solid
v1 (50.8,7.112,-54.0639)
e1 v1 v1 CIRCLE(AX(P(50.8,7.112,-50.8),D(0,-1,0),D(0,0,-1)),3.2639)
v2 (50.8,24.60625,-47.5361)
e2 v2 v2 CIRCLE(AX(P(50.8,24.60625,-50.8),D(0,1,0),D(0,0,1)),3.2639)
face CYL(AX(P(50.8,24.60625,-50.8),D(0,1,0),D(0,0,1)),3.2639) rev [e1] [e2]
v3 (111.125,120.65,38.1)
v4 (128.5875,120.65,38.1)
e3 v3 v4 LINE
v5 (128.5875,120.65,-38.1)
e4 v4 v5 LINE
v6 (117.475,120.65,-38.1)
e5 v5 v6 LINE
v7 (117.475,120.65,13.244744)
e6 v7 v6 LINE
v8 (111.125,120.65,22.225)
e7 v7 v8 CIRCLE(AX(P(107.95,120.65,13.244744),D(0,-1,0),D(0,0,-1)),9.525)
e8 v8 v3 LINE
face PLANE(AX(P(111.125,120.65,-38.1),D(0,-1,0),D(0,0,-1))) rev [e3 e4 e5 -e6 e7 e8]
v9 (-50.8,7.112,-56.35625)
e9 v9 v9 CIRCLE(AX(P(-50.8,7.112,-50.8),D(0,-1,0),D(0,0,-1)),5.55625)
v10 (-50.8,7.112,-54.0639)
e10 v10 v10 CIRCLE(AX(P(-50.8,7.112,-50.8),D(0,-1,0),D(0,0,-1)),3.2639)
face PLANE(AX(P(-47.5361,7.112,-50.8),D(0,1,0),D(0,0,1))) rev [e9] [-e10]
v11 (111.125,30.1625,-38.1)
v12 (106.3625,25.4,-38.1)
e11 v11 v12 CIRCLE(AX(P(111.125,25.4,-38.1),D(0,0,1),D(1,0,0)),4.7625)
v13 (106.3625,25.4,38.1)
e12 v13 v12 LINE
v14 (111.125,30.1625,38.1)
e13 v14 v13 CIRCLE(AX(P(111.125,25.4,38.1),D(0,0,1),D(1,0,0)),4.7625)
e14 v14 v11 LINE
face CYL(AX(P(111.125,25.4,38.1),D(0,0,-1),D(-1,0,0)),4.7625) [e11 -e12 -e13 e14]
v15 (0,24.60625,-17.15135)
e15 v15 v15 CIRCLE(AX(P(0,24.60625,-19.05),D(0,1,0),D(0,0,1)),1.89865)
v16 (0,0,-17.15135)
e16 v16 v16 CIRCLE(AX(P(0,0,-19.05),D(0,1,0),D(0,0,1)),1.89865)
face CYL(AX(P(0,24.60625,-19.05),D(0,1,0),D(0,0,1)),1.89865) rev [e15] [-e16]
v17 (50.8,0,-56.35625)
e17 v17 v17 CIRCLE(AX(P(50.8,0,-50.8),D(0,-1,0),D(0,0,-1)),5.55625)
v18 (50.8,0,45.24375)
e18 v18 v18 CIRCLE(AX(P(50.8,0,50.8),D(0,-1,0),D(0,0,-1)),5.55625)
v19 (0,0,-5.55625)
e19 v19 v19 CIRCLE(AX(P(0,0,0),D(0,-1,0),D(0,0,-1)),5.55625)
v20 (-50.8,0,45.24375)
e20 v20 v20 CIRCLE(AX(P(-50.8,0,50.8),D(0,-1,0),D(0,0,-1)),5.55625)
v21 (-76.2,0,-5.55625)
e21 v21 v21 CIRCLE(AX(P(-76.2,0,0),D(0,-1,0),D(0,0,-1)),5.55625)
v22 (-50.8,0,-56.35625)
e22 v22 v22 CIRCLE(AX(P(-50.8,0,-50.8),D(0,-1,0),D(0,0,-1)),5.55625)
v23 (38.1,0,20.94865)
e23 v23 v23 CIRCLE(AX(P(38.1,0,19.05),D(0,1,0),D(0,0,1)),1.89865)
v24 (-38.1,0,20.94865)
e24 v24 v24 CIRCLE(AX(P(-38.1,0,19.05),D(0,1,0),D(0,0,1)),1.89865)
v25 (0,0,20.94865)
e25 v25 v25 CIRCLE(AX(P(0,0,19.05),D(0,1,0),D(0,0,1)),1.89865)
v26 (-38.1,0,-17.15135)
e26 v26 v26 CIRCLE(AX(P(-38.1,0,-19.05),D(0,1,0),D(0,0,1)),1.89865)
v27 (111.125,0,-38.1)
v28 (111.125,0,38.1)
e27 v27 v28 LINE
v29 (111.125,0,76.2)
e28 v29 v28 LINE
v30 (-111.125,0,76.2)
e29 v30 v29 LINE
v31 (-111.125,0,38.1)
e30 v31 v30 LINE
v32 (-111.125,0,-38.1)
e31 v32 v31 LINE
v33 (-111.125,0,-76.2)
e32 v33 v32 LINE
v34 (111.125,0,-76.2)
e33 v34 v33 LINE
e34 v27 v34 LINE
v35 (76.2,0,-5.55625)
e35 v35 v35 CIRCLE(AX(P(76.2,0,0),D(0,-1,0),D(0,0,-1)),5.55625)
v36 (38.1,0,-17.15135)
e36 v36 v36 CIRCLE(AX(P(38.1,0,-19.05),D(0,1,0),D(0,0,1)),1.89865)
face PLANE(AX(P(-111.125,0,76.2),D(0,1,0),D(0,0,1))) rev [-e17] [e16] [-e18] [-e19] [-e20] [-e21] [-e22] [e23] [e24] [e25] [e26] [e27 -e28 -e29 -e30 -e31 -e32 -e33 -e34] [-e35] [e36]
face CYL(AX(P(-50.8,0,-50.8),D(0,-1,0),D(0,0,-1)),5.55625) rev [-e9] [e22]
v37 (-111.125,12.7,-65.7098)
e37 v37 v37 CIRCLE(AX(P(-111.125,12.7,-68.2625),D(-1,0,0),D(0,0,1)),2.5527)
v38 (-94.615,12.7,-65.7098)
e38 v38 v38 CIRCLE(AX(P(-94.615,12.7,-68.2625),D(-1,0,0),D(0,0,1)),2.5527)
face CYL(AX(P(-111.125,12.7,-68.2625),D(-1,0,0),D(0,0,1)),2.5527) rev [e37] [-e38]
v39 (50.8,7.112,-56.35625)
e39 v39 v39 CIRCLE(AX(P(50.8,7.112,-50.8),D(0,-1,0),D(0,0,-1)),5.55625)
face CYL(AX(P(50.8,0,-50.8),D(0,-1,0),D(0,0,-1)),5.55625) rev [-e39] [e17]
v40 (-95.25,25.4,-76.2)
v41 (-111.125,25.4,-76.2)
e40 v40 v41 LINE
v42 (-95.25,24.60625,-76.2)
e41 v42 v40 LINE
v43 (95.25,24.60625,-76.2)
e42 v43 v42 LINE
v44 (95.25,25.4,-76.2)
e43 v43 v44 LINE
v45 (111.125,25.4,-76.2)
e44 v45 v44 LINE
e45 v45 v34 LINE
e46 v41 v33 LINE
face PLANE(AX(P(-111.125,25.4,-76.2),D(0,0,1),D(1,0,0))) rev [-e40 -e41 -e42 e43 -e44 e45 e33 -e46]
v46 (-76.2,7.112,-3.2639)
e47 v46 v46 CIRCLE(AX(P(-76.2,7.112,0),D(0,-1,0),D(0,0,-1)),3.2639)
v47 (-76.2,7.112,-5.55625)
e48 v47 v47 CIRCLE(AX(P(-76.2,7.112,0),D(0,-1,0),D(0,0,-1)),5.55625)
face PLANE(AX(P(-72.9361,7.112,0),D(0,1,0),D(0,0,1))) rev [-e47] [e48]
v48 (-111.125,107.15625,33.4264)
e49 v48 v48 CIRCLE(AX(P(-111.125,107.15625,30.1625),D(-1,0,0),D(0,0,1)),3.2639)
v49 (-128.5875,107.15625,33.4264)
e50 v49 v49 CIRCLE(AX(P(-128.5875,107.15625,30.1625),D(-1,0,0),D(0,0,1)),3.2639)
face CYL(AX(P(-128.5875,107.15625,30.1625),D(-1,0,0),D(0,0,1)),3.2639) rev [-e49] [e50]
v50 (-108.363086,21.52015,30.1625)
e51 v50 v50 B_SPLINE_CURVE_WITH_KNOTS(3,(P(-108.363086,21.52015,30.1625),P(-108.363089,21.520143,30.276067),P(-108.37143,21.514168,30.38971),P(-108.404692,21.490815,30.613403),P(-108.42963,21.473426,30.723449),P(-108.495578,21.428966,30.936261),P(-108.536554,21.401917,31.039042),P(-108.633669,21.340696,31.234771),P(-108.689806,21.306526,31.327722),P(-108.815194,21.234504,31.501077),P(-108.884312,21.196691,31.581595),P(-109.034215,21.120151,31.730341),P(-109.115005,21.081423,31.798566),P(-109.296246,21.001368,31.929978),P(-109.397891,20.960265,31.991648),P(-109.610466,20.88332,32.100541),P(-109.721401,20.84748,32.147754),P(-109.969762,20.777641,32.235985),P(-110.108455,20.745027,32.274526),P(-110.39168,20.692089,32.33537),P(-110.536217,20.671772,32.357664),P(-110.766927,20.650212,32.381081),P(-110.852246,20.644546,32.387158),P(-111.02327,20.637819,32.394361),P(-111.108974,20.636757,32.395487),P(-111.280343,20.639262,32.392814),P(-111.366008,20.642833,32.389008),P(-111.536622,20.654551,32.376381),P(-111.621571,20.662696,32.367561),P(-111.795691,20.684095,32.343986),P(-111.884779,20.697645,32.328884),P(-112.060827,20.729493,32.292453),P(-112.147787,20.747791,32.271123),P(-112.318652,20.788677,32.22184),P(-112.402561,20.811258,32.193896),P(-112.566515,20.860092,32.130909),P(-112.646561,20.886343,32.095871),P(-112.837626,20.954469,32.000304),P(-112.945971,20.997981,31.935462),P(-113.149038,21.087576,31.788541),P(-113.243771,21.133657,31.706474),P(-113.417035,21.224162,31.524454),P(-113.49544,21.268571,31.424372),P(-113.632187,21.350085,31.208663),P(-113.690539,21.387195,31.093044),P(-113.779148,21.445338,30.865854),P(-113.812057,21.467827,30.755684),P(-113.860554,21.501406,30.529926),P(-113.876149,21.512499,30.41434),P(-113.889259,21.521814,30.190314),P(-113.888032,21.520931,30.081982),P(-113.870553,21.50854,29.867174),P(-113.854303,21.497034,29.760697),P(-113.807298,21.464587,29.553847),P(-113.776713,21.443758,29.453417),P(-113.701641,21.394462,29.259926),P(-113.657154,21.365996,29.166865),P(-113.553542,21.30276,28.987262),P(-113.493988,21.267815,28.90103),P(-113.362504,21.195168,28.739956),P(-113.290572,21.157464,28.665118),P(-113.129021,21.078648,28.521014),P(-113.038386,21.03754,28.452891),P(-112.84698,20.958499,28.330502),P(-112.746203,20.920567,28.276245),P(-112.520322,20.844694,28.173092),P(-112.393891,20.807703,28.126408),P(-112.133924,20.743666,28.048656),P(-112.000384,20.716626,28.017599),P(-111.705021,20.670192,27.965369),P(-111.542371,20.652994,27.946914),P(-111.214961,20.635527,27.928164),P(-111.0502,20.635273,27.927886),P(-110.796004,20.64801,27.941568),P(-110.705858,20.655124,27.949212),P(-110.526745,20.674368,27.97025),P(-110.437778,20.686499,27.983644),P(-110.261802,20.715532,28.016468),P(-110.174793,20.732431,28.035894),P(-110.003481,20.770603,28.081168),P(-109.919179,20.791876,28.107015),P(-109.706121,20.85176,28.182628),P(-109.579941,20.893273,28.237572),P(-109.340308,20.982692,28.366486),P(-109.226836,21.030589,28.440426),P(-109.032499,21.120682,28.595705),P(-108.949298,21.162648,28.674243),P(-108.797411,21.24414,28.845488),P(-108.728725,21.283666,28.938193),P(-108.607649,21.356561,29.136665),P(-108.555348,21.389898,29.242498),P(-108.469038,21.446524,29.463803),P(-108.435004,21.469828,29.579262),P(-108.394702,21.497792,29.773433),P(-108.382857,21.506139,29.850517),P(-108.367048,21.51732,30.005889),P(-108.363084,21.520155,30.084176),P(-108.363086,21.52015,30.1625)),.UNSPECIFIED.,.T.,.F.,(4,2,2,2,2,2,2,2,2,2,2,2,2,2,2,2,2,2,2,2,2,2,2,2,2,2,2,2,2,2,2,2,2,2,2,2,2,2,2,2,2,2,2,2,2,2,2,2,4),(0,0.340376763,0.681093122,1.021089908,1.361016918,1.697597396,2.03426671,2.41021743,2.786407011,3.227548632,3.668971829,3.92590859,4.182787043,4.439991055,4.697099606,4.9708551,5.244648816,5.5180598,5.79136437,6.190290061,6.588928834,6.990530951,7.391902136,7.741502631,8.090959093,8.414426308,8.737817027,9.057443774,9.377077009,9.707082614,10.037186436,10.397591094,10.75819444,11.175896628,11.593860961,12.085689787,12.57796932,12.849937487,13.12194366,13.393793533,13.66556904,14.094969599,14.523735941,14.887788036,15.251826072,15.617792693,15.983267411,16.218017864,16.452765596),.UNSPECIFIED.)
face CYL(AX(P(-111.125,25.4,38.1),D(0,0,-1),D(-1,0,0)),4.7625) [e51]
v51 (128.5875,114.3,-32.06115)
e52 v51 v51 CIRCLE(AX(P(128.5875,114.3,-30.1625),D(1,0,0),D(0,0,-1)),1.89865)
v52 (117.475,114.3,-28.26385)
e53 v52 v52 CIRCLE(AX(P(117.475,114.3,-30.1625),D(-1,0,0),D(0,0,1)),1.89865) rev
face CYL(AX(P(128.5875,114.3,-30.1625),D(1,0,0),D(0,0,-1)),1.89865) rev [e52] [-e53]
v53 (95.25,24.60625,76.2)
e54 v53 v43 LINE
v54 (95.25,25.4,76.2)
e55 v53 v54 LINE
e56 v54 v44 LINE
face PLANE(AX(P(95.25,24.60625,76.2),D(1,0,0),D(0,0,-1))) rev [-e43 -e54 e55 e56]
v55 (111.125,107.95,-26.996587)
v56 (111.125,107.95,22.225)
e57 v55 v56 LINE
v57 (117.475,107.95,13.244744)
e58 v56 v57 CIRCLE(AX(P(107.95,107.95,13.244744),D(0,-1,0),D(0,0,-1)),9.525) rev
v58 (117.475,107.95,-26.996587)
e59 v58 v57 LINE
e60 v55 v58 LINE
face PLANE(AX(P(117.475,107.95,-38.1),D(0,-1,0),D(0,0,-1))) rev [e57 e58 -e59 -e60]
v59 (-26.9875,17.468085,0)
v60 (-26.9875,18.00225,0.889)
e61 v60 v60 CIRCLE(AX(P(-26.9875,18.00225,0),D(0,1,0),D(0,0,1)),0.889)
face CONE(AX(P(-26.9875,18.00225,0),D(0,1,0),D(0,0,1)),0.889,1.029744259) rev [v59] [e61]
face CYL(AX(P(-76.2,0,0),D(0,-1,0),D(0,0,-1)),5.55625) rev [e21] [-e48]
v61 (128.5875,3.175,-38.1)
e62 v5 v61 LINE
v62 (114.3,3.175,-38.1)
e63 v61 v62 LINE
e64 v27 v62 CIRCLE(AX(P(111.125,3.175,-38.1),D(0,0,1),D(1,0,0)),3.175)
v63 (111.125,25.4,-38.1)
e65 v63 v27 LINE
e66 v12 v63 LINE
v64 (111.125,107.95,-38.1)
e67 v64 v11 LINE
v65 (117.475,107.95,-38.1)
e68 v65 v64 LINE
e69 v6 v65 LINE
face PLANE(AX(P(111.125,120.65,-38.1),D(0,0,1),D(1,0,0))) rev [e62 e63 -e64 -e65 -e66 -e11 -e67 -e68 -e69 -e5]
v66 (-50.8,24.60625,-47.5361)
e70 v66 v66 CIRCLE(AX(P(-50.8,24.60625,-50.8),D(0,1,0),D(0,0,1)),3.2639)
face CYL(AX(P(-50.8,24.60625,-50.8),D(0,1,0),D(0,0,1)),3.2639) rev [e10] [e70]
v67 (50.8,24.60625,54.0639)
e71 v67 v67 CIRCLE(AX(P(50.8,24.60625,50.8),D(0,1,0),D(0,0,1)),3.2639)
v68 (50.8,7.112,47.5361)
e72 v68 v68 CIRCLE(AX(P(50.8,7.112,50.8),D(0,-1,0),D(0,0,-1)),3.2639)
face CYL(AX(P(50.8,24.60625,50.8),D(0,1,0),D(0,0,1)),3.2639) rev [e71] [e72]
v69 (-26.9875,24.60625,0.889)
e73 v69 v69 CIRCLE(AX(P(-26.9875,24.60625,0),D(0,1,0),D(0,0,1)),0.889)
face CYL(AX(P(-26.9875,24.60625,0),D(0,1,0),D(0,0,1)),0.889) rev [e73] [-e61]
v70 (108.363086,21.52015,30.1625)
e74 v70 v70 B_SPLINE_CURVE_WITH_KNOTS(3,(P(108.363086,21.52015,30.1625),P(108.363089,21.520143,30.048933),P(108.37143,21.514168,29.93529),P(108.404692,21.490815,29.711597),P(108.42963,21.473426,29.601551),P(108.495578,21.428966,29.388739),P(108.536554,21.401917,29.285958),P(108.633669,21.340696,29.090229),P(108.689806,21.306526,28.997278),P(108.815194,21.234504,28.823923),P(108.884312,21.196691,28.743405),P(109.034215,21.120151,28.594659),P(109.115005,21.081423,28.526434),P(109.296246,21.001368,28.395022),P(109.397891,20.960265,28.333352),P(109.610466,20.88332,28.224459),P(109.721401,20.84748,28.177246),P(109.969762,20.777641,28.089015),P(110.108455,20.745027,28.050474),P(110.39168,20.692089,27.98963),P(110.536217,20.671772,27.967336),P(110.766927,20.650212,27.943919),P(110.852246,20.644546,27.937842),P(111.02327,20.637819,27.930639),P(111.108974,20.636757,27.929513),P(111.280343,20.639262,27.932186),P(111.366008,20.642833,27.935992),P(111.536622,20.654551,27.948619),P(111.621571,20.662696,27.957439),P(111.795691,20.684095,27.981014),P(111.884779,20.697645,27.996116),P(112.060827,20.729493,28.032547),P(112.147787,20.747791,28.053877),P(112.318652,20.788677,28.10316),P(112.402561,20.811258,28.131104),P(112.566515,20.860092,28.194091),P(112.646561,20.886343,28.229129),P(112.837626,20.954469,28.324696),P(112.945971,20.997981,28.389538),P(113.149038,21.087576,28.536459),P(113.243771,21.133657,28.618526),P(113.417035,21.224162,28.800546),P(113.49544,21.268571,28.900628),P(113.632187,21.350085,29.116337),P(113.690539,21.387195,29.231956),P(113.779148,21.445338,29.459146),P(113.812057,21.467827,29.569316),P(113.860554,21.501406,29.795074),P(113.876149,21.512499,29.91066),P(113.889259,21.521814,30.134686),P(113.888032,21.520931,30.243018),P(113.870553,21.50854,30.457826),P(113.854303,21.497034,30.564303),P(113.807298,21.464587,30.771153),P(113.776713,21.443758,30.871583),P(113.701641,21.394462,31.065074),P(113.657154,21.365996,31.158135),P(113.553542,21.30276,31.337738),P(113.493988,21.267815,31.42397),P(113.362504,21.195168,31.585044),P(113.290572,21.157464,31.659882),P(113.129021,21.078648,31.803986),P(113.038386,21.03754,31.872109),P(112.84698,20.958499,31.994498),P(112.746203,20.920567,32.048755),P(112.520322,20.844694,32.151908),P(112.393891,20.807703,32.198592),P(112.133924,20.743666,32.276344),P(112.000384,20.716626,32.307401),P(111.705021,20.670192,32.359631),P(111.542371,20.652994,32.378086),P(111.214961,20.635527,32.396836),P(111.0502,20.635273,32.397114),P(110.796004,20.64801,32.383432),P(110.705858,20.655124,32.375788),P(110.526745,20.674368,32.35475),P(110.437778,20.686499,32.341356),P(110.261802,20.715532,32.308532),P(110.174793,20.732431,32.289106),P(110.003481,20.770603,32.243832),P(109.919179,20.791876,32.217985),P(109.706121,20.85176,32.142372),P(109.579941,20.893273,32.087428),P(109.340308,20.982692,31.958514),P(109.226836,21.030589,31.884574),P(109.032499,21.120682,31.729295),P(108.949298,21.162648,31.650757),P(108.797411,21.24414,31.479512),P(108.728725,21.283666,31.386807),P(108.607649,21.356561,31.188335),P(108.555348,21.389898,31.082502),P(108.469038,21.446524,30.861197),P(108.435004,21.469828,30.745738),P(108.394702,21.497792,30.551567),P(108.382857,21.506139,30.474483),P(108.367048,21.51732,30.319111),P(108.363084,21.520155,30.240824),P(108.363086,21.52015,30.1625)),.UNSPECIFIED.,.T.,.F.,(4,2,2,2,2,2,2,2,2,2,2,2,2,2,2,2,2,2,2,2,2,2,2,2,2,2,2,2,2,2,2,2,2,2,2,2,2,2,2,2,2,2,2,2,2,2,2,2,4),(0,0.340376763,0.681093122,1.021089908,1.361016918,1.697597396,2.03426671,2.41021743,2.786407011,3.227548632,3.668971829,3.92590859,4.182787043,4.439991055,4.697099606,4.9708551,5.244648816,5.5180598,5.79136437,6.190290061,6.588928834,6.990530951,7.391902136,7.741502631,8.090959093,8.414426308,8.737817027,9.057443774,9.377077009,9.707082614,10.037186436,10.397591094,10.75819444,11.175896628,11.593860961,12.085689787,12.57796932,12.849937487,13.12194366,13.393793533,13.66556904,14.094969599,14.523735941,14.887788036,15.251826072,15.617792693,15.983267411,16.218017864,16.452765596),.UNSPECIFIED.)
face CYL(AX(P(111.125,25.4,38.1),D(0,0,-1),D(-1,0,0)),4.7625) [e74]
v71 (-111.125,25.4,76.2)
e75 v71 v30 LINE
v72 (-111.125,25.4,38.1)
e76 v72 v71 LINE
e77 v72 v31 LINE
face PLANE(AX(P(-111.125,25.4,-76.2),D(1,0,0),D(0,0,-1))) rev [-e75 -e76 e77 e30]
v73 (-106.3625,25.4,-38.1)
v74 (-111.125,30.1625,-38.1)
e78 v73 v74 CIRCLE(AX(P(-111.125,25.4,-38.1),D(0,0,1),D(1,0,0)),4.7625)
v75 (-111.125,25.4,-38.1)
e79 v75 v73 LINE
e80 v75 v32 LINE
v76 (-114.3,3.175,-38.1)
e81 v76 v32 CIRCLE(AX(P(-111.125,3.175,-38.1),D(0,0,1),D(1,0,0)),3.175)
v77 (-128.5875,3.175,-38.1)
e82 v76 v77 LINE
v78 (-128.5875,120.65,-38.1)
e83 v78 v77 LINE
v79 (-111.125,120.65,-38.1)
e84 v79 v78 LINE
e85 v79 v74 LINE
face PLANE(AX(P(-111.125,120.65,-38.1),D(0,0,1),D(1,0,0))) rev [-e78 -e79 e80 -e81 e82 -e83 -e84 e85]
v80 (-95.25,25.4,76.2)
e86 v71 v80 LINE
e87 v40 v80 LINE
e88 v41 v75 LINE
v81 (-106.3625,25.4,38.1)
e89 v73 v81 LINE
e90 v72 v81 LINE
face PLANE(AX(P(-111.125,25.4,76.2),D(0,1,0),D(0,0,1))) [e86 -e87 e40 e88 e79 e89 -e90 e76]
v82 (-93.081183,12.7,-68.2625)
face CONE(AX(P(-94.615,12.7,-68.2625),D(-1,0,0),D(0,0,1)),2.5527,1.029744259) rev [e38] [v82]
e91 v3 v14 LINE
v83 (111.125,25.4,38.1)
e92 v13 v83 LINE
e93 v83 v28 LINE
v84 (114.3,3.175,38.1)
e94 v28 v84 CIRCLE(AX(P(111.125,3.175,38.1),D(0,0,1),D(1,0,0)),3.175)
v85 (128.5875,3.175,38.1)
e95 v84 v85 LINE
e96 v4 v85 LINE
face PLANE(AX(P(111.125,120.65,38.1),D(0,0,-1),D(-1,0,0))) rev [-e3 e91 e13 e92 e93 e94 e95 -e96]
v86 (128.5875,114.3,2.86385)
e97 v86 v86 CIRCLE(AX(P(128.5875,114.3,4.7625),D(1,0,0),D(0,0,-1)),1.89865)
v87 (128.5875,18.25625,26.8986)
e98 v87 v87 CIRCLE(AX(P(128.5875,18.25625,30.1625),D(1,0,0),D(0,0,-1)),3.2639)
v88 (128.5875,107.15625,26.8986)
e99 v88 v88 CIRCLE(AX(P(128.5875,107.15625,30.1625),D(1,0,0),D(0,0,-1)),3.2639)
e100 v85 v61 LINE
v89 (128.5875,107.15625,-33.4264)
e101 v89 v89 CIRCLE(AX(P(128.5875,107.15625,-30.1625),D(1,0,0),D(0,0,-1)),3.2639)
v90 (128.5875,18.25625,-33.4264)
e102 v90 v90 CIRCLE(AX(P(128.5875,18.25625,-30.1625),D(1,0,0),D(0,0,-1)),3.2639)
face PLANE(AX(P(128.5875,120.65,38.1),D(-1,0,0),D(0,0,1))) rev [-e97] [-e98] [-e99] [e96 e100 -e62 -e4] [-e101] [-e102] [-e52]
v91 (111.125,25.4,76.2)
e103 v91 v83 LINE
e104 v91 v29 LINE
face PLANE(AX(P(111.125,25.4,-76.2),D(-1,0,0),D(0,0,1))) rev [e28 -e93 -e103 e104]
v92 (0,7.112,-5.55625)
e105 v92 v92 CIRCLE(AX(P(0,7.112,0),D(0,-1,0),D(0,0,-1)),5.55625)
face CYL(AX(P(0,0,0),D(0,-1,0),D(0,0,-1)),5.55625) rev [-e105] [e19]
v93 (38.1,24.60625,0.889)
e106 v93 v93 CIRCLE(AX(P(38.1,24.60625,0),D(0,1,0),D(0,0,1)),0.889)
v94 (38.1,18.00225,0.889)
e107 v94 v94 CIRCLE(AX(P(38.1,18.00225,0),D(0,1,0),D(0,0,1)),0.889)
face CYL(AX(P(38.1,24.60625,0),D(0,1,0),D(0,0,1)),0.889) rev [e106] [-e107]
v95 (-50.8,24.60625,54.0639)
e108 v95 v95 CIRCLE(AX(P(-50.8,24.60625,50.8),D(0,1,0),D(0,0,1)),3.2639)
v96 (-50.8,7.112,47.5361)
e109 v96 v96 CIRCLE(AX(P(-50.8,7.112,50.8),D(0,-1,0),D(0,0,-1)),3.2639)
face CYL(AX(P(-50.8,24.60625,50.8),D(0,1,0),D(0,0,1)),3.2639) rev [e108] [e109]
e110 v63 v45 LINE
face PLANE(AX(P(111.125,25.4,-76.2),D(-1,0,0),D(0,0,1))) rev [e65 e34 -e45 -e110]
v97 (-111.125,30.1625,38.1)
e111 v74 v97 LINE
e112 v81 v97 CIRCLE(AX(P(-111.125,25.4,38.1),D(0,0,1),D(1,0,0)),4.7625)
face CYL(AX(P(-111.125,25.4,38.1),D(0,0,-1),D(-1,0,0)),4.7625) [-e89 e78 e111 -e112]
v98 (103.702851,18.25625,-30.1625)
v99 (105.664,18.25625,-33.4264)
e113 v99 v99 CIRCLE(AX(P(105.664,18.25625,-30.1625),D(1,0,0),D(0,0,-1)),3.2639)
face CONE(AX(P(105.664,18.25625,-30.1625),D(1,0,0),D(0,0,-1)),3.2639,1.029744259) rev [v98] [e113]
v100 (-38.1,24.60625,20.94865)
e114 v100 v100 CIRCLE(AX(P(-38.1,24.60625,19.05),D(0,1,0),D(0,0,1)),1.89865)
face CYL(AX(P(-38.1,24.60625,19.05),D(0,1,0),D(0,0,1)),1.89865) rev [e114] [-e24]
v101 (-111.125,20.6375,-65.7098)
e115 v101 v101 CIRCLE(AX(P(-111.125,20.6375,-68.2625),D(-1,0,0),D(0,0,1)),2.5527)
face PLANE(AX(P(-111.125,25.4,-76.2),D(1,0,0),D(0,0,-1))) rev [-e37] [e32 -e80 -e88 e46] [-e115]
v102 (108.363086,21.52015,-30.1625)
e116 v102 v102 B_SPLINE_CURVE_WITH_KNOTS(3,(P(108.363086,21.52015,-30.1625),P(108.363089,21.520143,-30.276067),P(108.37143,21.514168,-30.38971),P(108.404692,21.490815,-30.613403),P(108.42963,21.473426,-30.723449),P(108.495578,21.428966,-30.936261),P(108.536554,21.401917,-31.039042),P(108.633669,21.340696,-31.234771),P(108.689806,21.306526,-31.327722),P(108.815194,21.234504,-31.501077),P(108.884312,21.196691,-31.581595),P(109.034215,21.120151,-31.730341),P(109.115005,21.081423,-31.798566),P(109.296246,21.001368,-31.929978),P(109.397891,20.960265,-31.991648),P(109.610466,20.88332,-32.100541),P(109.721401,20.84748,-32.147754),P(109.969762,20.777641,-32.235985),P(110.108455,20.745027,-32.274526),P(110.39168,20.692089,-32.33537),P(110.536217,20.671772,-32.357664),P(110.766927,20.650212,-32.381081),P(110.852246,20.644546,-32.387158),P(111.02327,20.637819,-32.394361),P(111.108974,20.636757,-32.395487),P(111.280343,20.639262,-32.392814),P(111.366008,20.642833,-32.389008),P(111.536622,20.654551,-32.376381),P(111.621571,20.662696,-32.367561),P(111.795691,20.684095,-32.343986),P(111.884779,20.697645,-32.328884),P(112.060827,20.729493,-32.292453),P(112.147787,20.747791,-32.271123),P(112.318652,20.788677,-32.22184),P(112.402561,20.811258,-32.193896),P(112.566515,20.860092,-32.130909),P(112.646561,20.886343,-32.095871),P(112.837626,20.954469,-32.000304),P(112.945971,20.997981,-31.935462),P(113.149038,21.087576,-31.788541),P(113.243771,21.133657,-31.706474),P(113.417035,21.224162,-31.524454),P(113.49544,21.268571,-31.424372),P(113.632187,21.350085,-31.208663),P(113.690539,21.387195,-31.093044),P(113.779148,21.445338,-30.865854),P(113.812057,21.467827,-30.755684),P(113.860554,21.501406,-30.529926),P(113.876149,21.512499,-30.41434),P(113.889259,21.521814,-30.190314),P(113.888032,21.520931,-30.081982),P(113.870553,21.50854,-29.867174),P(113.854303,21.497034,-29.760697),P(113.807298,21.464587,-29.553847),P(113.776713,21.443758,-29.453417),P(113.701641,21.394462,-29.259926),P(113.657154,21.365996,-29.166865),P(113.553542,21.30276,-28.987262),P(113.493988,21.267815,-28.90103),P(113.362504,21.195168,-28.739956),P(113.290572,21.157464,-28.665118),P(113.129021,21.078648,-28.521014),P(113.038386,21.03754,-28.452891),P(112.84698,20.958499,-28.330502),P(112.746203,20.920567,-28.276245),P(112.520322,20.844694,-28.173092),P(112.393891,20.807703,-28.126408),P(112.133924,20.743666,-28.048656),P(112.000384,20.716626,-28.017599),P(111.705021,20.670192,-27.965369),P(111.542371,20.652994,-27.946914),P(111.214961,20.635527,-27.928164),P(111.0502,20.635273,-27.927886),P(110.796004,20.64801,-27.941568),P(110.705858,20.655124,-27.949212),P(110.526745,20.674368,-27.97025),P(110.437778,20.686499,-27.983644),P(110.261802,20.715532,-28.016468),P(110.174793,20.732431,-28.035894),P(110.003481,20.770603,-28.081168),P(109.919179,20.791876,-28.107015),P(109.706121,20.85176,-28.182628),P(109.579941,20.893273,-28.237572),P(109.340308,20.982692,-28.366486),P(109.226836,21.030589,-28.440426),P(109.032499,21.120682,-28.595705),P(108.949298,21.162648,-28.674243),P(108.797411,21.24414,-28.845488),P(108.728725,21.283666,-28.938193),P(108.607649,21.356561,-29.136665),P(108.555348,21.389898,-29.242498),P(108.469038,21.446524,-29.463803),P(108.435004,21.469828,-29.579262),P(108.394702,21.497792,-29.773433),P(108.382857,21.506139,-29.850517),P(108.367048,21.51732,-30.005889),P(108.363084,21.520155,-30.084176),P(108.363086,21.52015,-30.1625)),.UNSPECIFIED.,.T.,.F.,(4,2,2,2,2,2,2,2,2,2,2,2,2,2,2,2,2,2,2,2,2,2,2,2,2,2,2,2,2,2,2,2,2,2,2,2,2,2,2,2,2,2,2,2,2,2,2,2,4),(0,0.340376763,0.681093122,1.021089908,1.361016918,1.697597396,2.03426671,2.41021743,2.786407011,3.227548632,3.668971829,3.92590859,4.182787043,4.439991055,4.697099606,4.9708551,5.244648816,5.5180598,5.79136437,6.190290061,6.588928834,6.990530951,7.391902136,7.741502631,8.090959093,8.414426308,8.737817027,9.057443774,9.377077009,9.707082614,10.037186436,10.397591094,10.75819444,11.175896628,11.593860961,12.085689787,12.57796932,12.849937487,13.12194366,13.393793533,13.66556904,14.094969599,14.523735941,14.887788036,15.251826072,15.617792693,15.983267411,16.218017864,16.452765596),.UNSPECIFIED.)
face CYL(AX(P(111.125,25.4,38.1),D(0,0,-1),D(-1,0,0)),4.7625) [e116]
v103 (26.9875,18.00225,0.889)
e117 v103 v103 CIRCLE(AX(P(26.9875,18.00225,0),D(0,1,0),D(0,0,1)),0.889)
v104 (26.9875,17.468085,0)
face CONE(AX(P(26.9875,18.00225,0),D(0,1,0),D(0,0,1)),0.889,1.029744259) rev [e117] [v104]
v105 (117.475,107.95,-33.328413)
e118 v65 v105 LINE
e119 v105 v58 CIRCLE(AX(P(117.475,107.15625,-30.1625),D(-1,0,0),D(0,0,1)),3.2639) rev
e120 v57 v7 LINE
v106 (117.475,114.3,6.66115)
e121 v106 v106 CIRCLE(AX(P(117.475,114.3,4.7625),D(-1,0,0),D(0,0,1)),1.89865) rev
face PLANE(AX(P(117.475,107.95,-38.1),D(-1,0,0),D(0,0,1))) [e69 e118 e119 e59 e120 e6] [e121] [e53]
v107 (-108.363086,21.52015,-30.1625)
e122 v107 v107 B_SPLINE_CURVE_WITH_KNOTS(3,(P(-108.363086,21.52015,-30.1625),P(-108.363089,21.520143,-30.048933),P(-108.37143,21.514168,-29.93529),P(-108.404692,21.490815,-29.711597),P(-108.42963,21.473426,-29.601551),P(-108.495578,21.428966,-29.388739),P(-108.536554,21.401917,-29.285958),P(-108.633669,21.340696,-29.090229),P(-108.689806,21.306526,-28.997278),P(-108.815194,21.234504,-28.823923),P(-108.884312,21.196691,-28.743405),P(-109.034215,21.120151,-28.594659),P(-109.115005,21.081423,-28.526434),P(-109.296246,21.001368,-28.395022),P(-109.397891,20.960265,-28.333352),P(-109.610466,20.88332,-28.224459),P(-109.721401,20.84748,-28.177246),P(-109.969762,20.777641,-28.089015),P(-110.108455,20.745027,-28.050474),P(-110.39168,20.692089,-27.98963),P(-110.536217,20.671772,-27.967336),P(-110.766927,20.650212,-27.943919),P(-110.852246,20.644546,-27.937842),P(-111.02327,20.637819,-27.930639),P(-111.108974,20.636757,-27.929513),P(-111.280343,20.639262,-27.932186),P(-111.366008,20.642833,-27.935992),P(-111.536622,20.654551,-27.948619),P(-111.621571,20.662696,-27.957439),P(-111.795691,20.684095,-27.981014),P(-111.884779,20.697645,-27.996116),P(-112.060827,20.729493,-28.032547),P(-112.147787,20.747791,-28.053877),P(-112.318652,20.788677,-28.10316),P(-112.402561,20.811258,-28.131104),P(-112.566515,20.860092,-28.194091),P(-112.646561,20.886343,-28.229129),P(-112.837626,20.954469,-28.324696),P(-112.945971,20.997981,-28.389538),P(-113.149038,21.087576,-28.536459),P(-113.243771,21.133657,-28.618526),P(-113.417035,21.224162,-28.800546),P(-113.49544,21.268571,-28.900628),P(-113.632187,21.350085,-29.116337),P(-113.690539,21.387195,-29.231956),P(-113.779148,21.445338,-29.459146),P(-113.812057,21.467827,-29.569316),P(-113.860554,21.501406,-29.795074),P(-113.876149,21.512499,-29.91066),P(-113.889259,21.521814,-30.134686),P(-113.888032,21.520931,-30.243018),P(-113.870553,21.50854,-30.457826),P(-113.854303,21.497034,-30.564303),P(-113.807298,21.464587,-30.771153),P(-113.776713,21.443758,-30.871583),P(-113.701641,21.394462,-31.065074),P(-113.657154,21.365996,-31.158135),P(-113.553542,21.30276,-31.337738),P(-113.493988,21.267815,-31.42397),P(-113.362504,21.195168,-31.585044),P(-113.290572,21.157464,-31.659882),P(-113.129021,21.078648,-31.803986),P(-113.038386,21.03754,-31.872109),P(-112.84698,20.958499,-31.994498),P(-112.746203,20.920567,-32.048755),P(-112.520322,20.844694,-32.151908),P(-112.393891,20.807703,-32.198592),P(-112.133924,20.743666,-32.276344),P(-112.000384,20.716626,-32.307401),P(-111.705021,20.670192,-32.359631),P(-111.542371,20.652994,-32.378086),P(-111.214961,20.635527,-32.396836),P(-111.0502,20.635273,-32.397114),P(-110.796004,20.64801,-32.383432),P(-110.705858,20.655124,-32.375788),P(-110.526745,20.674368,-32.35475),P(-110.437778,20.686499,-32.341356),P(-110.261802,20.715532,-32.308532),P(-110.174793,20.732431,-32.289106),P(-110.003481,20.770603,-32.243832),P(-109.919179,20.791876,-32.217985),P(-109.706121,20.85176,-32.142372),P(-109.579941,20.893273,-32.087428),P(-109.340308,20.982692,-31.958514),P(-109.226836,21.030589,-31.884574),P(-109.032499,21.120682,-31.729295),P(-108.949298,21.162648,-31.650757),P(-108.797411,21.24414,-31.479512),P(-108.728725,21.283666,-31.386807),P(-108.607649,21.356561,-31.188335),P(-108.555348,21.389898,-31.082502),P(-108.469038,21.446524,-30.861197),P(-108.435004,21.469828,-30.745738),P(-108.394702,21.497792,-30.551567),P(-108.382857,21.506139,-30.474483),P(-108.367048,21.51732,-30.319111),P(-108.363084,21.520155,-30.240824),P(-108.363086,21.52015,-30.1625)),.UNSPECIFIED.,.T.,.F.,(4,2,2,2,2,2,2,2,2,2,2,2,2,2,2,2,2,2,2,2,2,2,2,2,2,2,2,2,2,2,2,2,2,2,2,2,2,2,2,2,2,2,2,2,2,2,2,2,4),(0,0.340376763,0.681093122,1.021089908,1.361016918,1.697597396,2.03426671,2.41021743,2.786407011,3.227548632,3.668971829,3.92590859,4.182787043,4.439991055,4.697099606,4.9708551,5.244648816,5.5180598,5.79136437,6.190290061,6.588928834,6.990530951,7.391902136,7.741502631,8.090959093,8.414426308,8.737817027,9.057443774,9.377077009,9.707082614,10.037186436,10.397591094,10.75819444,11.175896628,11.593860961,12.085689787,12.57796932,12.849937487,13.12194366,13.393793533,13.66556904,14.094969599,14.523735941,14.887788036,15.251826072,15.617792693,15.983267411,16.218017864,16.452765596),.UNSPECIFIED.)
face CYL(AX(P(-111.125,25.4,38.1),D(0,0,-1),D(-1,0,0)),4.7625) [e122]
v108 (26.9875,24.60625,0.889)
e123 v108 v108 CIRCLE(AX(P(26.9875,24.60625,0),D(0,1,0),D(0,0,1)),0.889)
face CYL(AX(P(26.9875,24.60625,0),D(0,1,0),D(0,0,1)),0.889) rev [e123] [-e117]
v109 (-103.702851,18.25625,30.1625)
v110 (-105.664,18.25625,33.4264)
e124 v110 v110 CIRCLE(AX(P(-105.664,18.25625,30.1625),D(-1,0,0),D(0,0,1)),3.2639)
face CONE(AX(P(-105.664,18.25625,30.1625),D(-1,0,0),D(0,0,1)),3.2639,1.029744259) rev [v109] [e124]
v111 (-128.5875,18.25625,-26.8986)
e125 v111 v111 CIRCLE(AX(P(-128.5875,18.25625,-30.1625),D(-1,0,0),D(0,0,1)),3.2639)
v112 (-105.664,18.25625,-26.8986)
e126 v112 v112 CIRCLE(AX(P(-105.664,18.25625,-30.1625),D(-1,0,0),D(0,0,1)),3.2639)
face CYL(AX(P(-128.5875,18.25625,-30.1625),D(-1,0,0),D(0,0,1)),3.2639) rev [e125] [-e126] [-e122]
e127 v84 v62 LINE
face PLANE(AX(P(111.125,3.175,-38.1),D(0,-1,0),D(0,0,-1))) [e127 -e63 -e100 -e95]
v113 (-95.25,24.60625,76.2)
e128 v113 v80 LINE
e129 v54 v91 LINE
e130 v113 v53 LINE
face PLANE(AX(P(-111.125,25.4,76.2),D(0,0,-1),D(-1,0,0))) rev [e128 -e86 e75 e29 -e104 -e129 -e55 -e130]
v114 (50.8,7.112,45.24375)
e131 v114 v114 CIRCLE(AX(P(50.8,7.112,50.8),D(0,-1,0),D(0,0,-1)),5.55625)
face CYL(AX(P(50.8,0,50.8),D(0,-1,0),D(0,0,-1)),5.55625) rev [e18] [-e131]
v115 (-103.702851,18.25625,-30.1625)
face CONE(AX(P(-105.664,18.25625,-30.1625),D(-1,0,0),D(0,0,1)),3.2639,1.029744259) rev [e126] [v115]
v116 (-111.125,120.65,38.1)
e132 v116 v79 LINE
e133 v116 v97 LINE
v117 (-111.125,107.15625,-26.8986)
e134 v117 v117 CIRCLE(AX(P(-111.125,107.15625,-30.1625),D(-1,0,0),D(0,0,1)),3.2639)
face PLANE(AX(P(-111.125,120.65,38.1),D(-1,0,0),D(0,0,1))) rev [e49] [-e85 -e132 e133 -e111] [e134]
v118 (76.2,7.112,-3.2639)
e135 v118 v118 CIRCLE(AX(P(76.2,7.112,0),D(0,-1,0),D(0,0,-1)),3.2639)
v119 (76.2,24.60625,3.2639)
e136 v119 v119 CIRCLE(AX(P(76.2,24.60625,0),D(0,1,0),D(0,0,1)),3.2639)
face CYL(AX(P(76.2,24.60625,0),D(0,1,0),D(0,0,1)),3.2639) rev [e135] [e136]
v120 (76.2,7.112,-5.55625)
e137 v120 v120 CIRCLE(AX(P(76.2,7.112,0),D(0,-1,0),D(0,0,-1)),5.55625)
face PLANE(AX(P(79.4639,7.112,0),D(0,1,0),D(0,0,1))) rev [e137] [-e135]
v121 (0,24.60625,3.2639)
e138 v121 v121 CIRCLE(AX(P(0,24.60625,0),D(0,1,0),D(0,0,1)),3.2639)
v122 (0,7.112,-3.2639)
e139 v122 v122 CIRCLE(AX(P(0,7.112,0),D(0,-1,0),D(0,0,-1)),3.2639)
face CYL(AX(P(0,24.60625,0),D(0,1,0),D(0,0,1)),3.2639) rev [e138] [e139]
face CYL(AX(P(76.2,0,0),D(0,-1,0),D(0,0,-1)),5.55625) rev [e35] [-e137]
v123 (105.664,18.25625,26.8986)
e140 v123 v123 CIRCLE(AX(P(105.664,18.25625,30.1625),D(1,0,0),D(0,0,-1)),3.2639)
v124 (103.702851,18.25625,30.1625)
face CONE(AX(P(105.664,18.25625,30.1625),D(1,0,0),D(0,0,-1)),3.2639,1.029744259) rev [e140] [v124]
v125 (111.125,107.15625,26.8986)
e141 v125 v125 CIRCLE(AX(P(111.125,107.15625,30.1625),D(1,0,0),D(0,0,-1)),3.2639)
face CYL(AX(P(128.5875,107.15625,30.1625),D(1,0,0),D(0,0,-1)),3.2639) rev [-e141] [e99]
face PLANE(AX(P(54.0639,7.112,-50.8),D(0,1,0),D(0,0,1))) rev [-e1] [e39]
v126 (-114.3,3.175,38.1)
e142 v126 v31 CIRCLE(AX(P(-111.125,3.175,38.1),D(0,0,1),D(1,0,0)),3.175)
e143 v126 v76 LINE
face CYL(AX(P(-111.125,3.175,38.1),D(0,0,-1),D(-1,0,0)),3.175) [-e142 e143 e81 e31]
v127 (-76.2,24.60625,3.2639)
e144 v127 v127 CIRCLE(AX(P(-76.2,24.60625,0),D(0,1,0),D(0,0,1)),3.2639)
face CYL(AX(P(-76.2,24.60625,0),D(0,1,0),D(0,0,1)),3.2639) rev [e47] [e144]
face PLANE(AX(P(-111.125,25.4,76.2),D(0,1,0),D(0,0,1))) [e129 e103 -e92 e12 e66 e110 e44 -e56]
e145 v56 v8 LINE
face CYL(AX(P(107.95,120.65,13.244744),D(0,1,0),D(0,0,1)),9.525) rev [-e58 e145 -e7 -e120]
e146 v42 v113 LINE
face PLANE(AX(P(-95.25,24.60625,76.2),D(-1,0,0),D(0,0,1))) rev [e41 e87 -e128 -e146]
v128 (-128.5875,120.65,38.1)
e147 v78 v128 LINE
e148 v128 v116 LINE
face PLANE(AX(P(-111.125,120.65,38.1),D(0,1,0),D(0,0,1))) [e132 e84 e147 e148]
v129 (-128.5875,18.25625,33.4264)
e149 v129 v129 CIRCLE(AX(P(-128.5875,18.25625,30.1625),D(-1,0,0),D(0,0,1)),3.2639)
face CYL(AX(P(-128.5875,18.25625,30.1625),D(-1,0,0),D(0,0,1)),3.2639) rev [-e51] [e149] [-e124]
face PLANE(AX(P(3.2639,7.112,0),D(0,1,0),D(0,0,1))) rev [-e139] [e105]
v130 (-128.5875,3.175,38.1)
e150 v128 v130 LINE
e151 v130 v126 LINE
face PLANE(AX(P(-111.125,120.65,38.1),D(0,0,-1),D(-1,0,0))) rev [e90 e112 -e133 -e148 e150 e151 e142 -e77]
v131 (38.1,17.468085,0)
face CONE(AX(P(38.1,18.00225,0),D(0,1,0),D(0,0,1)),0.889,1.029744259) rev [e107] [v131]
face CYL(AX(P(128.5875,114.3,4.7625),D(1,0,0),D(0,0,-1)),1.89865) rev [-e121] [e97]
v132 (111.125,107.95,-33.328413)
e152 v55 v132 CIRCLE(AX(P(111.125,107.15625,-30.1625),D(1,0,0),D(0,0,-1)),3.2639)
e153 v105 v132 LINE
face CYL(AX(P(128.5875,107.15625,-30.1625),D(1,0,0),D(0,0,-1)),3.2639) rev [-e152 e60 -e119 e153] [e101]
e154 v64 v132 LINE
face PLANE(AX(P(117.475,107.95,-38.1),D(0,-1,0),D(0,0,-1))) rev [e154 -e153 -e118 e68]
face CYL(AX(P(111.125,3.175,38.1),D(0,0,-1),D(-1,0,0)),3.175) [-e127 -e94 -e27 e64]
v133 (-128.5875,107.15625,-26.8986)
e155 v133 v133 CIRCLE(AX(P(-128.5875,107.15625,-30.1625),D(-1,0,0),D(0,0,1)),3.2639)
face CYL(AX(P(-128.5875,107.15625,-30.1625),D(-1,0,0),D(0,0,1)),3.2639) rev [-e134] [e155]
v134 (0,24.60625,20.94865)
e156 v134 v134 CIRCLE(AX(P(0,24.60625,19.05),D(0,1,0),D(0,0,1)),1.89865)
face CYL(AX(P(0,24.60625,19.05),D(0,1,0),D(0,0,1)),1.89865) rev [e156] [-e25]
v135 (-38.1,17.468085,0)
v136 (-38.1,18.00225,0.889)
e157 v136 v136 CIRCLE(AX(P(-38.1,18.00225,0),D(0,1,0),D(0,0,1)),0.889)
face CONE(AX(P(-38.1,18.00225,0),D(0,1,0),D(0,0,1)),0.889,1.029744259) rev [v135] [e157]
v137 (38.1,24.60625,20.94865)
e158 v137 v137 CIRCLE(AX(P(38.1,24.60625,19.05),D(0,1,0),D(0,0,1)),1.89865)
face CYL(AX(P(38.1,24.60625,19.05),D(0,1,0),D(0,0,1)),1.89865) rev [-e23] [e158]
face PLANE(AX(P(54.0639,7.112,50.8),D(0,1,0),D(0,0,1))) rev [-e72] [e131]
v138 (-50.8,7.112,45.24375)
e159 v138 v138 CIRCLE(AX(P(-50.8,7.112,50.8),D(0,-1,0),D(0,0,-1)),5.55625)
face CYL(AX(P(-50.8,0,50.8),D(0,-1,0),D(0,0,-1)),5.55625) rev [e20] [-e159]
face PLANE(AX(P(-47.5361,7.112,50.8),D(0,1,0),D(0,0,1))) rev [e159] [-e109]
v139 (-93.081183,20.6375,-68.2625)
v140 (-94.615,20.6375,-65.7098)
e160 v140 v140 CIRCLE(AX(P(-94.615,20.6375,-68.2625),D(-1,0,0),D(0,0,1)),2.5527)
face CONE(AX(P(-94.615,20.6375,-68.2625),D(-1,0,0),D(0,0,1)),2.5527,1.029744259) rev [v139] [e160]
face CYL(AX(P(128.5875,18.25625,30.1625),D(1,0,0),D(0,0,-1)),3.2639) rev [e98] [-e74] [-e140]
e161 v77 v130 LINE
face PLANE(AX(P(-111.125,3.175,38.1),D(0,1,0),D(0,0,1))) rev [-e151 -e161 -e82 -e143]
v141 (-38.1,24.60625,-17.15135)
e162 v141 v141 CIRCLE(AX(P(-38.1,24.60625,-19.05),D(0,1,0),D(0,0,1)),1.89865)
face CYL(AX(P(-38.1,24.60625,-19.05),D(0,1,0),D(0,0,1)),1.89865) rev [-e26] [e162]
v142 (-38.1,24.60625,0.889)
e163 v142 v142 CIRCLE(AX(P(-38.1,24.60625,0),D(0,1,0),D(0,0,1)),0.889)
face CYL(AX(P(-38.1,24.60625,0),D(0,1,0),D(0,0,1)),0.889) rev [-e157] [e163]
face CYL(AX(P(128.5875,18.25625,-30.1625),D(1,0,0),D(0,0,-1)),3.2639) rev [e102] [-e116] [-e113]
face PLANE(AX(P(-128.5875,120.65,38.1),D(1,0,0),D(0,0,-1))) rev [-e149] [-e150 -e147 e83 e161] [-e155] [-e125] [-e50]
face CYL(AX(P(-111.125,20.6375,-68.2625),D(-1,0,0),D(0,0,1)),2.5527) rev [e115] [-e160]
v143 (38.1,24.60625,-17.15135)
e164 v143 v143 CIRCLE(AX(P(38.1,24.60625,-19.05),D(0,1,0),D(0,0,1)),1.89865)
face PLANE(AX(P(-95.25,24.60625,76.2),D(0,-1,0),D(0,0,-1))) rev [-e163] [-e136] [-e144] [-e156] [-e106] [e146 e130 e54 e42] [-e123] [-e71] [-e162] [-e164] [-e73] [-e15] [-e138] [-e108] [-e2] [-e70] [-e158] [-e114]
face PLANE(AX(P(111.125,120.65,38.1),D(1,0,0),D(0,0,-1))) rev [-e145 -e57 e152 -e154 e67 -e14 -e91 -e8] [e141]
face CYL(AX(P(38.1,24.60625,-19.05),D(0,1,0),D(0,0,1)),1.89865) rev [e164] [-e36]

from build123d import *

# Parameters (mm, degrees)
SKETCH1_W                                        = 222.25
SKETCH1_H                                        = 152.4
EXTRUDE1_DEPTH                                   = 25.4
SKETCH2_W                                        = 17.4625
SKETCH2_H                                        = 76.2
EXTRUDE2_DEPTH                                   = 117.475
SKETCH5_W                                        = 190.5
SKETCH5_H                                        = 152.4
CUT_EXTRUDE1_DEPTH                               = 0.79375
F_5_16_18_TAPPED_HOLE1_D                         = 6.5278
F_5_16_18_TAPPED_HOLE1_DEPTH                     = 22.9235
F_5_16_18_TAPPED_HOLE1_TIP                       = 1.961148974
F_5_16_18_TAPPED_HOLE2_D                         = 6.5278
F_5_16_18_TAPPED_HOLE2_DEPTH                     = 22.9235
F_5_16_18_TAPPED_HOLE2_TIP                       = 1.961148974
SKETCH9_R                                        = 4.7625
SKETCH9_R_2                                      = 3.175
EXTRUDE3_DEPTH                                   = 38.1
F_5_16_18_TAPPED_HOLE3_D                         = 6.5278
F_10_24_TAPPED_HOLE2_D                           = 3.7973
F_1_4_20_TAPPED_HOLE1_D                          = 5.1054
F_1_4_20_TAPPED_HOLE1_DEPTH                      = 16.51
F_1_4_20_TAPPED_HOLE1_TIP                        = 1.533816902
F_2_56_TAPPED_HOLE1_D                            = 1.778
F_2_56_TAPPED_HOLE1_DEPTH                        = 6.604
F_2_56_TAPPED_HOLE1_TIP                          = 0.53416509
F_10_24_TAPPED_HOLE3_D                           = 3.7973
F_10_24_TAPPED_HOLE3_DEPTH                       = 17.4625
SKETCH21_W                                       = 60.325
SKETCH21_H                                       = 12.7
CUT_EXTRUDE2_DEPTH                               = 6.35
FILLET1_R                                        = 9.525
CBORE_FOR_1_4_SOCKET_HEAD_CAP_SCREW1_D           = 6.5278
CBORE_FOR_1_4_SOCKET_HEAD_CAP_SCREW1_DEPTH       = 120.65
CBORE_FOR_1_4_SOCKET_HEAD_CAP_SCREW1_CBORE_D     = 11.1125
CBORE_FOR_1_4_SOCKET_HEAD_CAP_SCREW1_CBORE_DEPTH = 7.112


with BuildPart() as part:
    # Sketch1 → Extrude1 (new body)
    with BuildSketch(Plane(origin=(0, 0, 0), x_dir=(1, 0, 0), z_dir=(0, 1, 0))):
        Rectangle(SKETCH1_W, SKETCH1_H)
    extrude(amount=EXTRUDE1_DEPTH)

    # Sketch2 → Extrude2 (add)
    with BuildSketch(Plane(origin=(0, 3.175, 0), x_dir=(-1, 0, 0), z_dir=(0, 1, 0))):
        with Locations((119.85625, 0)):
            Rectangle(SKETCH2_W, SKETCH2_H)
        with Locations((-119.85625, 0)):
            Rectangle(SKETCH2_W, SKETCH2_H)
    extrude(amount=EXTRUDE2_DEPTH)

    # Sketch5 → Cut-Extrude1 (cut)
    with BuildSketch(Plane(origin=(0, 25.4, 0), x_dir=(-1, 0, 0), z_dir=(0, 1, 0))):
        Rectangle(SKETCH5_W, SKETCH5_H)
    extrude(amount=-CUT_EXTRUDE1_DEPTH, mode=Mode.SUBTRACT)

    # 5/16-18 Tapped Hole1
    with Locations(Plane(origin=(128.5875, 0, 0), x_dir=(0, 0, -1), z_dir=(1, 0, 0))):
        with Locations((-30.1625, 107.15625), (-30.1625, 18.25625), (30.1625, 18.25625), (30.1625, 107.15625)):
            Hole(F_5_16_18_TAPPED_HOLE1_D / 2, depth=F_5_16_18_TAPPED_HOLE1_DEPTH)
            with Locations((0, 0, -(F_5_16_18_TAPPED_HOLE1_DEPTH + F_5_16_18_TAPPED_HOLE1_TIP / 2))):  # 118° drill point
                Cone(0, F_5_16_18_TAPPED_HOLE1_D / 2, F_5_16_18_TAPPED_HOLE1_TIP, mode=Mode.SUBTRACT)

    # 5/16-18 Tapped Hole2
    with Locations(Plane.ZY.offset(128.5875)):
        with Locations((30.1625, 107.15625), (-30.1625, 107.15625), (-30.1625, 18.25625), (30.1625, 18.25625)):
            Hole(F_5_16_18_TAPPED_HOLE2_D / 2, depth=F_5_16_18_TAPPED_HOLE2_DEPTH)
            with Locations((0, 0, -(F_5_16_18_TAPPED_HOLE2_DEPTH + F_5_16_18_TAPPED_HOLE2_TIP / 2))):  # 118° drill point
                Cone(0, F_5_16_18_TAPPED_HOLE2_D / 2, F_5_16_18_TAPPED_HOLE2_TIP, mode=Mode.SUBTRACT)

    # Sketch9 → Extrude3 (add, symmetric)
    with BuildSketch(Plane.XY):
        with Locations((-111.125, 25.4)):
            Circle(SKETCH9_R)
        with Locations((-111.125, 3.175)):
            Circle(SKETCH9_R_2)
        with Locations((111.125, 3.175)):
            Circle(SKETCH9_R_2)
        with Locations((111.125, 25.4)):
            Circle(SKETCH9_R)
    extrude(amount=EXTRUDE3_DEPTH, both=True)

    # 5/16-18 Tapped Hole3 (through all)
    with Locations(Plane(origin=(0, 24.60625, 0), x_dir=(-1, 0, 0), z_dir=(0, 1, 0))):
        with Locations((0, 0), (50.8, -50.8), (50.8, 50.8), (-50.8, 50.8), (-50.8, -50.8), (76.2, 0), (-76.2, 0)):
            Hole(F_5_16_18_TAPPED_HOLE3_D / 2)

    # #10-24 Tapped Hole2 (through all)
    with Locations(Plane(origin=(0, 24.60625, 0), x_dir=(-1, 0, 0), z_dir=(0, 1, 0))):
        with Locations((38.1, 19.05), (38.1, -19.05), (0, -19.05), (0, 19.05), (-38.1, 19.05), (-38.1, -19.05)):
            Hole(F_10_24_TAPPED_HOLE2_D / 2)

    # 1/4-20 Tapped Hole1
    with Locations(Plane.ZY.offset(111.125)):
        with Locations((-68.2625, 12.7), (-68.2625, 20.6375)):
            Hole(F_1_4_20_TAPPED_HOLE1_D / 2, depth=F_1_4_20_TAPPED_HOLE1_DEPTH)
            with Locations((0, 0, -(F_1_4_20_TAPPED_HOLE1_DEPTH + F_1_4_20_TAPPED_HOLE1_TIP / 2))):  # 118° drill point
                Cone(0, F_1_4_20_TAPPED_HOLE1_D / 2, F_1_4_20_TAPPED_HOLE1_TIP, mode=Mode.SUBTRACT)

    # #2-56 Tapped Hole1
    with Locations(Plane(origin=(0, 24.60625, 0), x_dir=(-1, 0, 0), z_dir=(0, 1, 0))):
        with Locations((38.1, 0), (26.9875, 0), (-38.1, 0), (-26.9875, 0)):
            Hole(F_2_56_TAPPED_HOLE1_D / 2, depth=F_2_56_TAPPED_HOLE1_DEPTH)
            with Locations((0, 0, -(F_2_56_TAPPED_HOLE1_DEPTH + F_2_56_TAPPED_HOLE1_TIP / 2))):  # 118° drill point
                Cone(0, F_2_56_TAPPED_HOLE1_D / 2, F_2_56_TAPPED_HOLE1_TIP, mode=Mode.SUBTRACT)

    # #10-24 Tapped Hole3
    with Locations(Plane(origin=(128.5875, 0, 0), x_dir=(0, 0, -1), z_dir=(1, 0, 0))):
        with Locations((-4.7625, 114.3), (30.1625, 114.3)):
            Hole(F_10_24_TAPPED_HOLE3_D / 2, depth=F_10_24_TAPPED_HOLE3_DEPTH)

    # Sketch21 → Cut-Extrude2 (cut)
    with BuildSketch(Plane.ZY.offset(-111.125)):
        with Locations((-7.9375, 114.3)):
            Rectangle(SKETCH21_W, SKETCH21_H)
    extrude(amount=-CUT_EXTRUDE2_DEPTH, mode=Mode.SUBTRACT)

    # Fillet1
    # the kernel refuses this fillet: 9.525 mm, written as the material it adds along each edge
    with BuildSketch(Plane(origin=(117.475, 120.65, 22.225), x_dir=(0, 0, -1), z_dir=(0, -1, 0))) as fillet1_piece_1:
        with BuildLine():
            CenterArc((8.980256121, -9.525), FILLET1_R, 90, 70.528779366)
            Line((0, -6.35), (-0.179605122, -6.2865))
            ThreePointArc((-0.179605122, -6.2865), (-0.1905, -3.175), (-0.1905, 0))
            Line((-0.1905, 0), (0, 0.1905))
            Line((0, 0.1905), (8.980256121, 0.1905))
            Line((8.980256121, 0.1905), (8.980256121, 0))
        make_face()
    extrude(amount=35.150640303)

    # CBORE for 1/4 Socket Head Cap Screw1
    with Locations(Plane.XZ):
        with Locations((-50.8, 50.8), (50.8, 50.8), (50.8, -50.8), (0, 0), (-50.8, -50.8), (-76.2, 0), (76.2, 0)):
            CounterBoreHole(CBORE_FOR_1_4_SOCKET_HEAD_CAP_SCREW1_D / 2, CBORE_FOR_1_4_SOCKET_HEAD_CAP_SCREW1_CBORE_D / 2, CBORE_FOR_1_4_SOCKET_HEAD_CAP_SCREW1_CBORE_DEPTH, depth=CBORE_FOR_1_4_SOCKET_HEAD_CAP_SCREW1_DEPTH)


solid = part.part
